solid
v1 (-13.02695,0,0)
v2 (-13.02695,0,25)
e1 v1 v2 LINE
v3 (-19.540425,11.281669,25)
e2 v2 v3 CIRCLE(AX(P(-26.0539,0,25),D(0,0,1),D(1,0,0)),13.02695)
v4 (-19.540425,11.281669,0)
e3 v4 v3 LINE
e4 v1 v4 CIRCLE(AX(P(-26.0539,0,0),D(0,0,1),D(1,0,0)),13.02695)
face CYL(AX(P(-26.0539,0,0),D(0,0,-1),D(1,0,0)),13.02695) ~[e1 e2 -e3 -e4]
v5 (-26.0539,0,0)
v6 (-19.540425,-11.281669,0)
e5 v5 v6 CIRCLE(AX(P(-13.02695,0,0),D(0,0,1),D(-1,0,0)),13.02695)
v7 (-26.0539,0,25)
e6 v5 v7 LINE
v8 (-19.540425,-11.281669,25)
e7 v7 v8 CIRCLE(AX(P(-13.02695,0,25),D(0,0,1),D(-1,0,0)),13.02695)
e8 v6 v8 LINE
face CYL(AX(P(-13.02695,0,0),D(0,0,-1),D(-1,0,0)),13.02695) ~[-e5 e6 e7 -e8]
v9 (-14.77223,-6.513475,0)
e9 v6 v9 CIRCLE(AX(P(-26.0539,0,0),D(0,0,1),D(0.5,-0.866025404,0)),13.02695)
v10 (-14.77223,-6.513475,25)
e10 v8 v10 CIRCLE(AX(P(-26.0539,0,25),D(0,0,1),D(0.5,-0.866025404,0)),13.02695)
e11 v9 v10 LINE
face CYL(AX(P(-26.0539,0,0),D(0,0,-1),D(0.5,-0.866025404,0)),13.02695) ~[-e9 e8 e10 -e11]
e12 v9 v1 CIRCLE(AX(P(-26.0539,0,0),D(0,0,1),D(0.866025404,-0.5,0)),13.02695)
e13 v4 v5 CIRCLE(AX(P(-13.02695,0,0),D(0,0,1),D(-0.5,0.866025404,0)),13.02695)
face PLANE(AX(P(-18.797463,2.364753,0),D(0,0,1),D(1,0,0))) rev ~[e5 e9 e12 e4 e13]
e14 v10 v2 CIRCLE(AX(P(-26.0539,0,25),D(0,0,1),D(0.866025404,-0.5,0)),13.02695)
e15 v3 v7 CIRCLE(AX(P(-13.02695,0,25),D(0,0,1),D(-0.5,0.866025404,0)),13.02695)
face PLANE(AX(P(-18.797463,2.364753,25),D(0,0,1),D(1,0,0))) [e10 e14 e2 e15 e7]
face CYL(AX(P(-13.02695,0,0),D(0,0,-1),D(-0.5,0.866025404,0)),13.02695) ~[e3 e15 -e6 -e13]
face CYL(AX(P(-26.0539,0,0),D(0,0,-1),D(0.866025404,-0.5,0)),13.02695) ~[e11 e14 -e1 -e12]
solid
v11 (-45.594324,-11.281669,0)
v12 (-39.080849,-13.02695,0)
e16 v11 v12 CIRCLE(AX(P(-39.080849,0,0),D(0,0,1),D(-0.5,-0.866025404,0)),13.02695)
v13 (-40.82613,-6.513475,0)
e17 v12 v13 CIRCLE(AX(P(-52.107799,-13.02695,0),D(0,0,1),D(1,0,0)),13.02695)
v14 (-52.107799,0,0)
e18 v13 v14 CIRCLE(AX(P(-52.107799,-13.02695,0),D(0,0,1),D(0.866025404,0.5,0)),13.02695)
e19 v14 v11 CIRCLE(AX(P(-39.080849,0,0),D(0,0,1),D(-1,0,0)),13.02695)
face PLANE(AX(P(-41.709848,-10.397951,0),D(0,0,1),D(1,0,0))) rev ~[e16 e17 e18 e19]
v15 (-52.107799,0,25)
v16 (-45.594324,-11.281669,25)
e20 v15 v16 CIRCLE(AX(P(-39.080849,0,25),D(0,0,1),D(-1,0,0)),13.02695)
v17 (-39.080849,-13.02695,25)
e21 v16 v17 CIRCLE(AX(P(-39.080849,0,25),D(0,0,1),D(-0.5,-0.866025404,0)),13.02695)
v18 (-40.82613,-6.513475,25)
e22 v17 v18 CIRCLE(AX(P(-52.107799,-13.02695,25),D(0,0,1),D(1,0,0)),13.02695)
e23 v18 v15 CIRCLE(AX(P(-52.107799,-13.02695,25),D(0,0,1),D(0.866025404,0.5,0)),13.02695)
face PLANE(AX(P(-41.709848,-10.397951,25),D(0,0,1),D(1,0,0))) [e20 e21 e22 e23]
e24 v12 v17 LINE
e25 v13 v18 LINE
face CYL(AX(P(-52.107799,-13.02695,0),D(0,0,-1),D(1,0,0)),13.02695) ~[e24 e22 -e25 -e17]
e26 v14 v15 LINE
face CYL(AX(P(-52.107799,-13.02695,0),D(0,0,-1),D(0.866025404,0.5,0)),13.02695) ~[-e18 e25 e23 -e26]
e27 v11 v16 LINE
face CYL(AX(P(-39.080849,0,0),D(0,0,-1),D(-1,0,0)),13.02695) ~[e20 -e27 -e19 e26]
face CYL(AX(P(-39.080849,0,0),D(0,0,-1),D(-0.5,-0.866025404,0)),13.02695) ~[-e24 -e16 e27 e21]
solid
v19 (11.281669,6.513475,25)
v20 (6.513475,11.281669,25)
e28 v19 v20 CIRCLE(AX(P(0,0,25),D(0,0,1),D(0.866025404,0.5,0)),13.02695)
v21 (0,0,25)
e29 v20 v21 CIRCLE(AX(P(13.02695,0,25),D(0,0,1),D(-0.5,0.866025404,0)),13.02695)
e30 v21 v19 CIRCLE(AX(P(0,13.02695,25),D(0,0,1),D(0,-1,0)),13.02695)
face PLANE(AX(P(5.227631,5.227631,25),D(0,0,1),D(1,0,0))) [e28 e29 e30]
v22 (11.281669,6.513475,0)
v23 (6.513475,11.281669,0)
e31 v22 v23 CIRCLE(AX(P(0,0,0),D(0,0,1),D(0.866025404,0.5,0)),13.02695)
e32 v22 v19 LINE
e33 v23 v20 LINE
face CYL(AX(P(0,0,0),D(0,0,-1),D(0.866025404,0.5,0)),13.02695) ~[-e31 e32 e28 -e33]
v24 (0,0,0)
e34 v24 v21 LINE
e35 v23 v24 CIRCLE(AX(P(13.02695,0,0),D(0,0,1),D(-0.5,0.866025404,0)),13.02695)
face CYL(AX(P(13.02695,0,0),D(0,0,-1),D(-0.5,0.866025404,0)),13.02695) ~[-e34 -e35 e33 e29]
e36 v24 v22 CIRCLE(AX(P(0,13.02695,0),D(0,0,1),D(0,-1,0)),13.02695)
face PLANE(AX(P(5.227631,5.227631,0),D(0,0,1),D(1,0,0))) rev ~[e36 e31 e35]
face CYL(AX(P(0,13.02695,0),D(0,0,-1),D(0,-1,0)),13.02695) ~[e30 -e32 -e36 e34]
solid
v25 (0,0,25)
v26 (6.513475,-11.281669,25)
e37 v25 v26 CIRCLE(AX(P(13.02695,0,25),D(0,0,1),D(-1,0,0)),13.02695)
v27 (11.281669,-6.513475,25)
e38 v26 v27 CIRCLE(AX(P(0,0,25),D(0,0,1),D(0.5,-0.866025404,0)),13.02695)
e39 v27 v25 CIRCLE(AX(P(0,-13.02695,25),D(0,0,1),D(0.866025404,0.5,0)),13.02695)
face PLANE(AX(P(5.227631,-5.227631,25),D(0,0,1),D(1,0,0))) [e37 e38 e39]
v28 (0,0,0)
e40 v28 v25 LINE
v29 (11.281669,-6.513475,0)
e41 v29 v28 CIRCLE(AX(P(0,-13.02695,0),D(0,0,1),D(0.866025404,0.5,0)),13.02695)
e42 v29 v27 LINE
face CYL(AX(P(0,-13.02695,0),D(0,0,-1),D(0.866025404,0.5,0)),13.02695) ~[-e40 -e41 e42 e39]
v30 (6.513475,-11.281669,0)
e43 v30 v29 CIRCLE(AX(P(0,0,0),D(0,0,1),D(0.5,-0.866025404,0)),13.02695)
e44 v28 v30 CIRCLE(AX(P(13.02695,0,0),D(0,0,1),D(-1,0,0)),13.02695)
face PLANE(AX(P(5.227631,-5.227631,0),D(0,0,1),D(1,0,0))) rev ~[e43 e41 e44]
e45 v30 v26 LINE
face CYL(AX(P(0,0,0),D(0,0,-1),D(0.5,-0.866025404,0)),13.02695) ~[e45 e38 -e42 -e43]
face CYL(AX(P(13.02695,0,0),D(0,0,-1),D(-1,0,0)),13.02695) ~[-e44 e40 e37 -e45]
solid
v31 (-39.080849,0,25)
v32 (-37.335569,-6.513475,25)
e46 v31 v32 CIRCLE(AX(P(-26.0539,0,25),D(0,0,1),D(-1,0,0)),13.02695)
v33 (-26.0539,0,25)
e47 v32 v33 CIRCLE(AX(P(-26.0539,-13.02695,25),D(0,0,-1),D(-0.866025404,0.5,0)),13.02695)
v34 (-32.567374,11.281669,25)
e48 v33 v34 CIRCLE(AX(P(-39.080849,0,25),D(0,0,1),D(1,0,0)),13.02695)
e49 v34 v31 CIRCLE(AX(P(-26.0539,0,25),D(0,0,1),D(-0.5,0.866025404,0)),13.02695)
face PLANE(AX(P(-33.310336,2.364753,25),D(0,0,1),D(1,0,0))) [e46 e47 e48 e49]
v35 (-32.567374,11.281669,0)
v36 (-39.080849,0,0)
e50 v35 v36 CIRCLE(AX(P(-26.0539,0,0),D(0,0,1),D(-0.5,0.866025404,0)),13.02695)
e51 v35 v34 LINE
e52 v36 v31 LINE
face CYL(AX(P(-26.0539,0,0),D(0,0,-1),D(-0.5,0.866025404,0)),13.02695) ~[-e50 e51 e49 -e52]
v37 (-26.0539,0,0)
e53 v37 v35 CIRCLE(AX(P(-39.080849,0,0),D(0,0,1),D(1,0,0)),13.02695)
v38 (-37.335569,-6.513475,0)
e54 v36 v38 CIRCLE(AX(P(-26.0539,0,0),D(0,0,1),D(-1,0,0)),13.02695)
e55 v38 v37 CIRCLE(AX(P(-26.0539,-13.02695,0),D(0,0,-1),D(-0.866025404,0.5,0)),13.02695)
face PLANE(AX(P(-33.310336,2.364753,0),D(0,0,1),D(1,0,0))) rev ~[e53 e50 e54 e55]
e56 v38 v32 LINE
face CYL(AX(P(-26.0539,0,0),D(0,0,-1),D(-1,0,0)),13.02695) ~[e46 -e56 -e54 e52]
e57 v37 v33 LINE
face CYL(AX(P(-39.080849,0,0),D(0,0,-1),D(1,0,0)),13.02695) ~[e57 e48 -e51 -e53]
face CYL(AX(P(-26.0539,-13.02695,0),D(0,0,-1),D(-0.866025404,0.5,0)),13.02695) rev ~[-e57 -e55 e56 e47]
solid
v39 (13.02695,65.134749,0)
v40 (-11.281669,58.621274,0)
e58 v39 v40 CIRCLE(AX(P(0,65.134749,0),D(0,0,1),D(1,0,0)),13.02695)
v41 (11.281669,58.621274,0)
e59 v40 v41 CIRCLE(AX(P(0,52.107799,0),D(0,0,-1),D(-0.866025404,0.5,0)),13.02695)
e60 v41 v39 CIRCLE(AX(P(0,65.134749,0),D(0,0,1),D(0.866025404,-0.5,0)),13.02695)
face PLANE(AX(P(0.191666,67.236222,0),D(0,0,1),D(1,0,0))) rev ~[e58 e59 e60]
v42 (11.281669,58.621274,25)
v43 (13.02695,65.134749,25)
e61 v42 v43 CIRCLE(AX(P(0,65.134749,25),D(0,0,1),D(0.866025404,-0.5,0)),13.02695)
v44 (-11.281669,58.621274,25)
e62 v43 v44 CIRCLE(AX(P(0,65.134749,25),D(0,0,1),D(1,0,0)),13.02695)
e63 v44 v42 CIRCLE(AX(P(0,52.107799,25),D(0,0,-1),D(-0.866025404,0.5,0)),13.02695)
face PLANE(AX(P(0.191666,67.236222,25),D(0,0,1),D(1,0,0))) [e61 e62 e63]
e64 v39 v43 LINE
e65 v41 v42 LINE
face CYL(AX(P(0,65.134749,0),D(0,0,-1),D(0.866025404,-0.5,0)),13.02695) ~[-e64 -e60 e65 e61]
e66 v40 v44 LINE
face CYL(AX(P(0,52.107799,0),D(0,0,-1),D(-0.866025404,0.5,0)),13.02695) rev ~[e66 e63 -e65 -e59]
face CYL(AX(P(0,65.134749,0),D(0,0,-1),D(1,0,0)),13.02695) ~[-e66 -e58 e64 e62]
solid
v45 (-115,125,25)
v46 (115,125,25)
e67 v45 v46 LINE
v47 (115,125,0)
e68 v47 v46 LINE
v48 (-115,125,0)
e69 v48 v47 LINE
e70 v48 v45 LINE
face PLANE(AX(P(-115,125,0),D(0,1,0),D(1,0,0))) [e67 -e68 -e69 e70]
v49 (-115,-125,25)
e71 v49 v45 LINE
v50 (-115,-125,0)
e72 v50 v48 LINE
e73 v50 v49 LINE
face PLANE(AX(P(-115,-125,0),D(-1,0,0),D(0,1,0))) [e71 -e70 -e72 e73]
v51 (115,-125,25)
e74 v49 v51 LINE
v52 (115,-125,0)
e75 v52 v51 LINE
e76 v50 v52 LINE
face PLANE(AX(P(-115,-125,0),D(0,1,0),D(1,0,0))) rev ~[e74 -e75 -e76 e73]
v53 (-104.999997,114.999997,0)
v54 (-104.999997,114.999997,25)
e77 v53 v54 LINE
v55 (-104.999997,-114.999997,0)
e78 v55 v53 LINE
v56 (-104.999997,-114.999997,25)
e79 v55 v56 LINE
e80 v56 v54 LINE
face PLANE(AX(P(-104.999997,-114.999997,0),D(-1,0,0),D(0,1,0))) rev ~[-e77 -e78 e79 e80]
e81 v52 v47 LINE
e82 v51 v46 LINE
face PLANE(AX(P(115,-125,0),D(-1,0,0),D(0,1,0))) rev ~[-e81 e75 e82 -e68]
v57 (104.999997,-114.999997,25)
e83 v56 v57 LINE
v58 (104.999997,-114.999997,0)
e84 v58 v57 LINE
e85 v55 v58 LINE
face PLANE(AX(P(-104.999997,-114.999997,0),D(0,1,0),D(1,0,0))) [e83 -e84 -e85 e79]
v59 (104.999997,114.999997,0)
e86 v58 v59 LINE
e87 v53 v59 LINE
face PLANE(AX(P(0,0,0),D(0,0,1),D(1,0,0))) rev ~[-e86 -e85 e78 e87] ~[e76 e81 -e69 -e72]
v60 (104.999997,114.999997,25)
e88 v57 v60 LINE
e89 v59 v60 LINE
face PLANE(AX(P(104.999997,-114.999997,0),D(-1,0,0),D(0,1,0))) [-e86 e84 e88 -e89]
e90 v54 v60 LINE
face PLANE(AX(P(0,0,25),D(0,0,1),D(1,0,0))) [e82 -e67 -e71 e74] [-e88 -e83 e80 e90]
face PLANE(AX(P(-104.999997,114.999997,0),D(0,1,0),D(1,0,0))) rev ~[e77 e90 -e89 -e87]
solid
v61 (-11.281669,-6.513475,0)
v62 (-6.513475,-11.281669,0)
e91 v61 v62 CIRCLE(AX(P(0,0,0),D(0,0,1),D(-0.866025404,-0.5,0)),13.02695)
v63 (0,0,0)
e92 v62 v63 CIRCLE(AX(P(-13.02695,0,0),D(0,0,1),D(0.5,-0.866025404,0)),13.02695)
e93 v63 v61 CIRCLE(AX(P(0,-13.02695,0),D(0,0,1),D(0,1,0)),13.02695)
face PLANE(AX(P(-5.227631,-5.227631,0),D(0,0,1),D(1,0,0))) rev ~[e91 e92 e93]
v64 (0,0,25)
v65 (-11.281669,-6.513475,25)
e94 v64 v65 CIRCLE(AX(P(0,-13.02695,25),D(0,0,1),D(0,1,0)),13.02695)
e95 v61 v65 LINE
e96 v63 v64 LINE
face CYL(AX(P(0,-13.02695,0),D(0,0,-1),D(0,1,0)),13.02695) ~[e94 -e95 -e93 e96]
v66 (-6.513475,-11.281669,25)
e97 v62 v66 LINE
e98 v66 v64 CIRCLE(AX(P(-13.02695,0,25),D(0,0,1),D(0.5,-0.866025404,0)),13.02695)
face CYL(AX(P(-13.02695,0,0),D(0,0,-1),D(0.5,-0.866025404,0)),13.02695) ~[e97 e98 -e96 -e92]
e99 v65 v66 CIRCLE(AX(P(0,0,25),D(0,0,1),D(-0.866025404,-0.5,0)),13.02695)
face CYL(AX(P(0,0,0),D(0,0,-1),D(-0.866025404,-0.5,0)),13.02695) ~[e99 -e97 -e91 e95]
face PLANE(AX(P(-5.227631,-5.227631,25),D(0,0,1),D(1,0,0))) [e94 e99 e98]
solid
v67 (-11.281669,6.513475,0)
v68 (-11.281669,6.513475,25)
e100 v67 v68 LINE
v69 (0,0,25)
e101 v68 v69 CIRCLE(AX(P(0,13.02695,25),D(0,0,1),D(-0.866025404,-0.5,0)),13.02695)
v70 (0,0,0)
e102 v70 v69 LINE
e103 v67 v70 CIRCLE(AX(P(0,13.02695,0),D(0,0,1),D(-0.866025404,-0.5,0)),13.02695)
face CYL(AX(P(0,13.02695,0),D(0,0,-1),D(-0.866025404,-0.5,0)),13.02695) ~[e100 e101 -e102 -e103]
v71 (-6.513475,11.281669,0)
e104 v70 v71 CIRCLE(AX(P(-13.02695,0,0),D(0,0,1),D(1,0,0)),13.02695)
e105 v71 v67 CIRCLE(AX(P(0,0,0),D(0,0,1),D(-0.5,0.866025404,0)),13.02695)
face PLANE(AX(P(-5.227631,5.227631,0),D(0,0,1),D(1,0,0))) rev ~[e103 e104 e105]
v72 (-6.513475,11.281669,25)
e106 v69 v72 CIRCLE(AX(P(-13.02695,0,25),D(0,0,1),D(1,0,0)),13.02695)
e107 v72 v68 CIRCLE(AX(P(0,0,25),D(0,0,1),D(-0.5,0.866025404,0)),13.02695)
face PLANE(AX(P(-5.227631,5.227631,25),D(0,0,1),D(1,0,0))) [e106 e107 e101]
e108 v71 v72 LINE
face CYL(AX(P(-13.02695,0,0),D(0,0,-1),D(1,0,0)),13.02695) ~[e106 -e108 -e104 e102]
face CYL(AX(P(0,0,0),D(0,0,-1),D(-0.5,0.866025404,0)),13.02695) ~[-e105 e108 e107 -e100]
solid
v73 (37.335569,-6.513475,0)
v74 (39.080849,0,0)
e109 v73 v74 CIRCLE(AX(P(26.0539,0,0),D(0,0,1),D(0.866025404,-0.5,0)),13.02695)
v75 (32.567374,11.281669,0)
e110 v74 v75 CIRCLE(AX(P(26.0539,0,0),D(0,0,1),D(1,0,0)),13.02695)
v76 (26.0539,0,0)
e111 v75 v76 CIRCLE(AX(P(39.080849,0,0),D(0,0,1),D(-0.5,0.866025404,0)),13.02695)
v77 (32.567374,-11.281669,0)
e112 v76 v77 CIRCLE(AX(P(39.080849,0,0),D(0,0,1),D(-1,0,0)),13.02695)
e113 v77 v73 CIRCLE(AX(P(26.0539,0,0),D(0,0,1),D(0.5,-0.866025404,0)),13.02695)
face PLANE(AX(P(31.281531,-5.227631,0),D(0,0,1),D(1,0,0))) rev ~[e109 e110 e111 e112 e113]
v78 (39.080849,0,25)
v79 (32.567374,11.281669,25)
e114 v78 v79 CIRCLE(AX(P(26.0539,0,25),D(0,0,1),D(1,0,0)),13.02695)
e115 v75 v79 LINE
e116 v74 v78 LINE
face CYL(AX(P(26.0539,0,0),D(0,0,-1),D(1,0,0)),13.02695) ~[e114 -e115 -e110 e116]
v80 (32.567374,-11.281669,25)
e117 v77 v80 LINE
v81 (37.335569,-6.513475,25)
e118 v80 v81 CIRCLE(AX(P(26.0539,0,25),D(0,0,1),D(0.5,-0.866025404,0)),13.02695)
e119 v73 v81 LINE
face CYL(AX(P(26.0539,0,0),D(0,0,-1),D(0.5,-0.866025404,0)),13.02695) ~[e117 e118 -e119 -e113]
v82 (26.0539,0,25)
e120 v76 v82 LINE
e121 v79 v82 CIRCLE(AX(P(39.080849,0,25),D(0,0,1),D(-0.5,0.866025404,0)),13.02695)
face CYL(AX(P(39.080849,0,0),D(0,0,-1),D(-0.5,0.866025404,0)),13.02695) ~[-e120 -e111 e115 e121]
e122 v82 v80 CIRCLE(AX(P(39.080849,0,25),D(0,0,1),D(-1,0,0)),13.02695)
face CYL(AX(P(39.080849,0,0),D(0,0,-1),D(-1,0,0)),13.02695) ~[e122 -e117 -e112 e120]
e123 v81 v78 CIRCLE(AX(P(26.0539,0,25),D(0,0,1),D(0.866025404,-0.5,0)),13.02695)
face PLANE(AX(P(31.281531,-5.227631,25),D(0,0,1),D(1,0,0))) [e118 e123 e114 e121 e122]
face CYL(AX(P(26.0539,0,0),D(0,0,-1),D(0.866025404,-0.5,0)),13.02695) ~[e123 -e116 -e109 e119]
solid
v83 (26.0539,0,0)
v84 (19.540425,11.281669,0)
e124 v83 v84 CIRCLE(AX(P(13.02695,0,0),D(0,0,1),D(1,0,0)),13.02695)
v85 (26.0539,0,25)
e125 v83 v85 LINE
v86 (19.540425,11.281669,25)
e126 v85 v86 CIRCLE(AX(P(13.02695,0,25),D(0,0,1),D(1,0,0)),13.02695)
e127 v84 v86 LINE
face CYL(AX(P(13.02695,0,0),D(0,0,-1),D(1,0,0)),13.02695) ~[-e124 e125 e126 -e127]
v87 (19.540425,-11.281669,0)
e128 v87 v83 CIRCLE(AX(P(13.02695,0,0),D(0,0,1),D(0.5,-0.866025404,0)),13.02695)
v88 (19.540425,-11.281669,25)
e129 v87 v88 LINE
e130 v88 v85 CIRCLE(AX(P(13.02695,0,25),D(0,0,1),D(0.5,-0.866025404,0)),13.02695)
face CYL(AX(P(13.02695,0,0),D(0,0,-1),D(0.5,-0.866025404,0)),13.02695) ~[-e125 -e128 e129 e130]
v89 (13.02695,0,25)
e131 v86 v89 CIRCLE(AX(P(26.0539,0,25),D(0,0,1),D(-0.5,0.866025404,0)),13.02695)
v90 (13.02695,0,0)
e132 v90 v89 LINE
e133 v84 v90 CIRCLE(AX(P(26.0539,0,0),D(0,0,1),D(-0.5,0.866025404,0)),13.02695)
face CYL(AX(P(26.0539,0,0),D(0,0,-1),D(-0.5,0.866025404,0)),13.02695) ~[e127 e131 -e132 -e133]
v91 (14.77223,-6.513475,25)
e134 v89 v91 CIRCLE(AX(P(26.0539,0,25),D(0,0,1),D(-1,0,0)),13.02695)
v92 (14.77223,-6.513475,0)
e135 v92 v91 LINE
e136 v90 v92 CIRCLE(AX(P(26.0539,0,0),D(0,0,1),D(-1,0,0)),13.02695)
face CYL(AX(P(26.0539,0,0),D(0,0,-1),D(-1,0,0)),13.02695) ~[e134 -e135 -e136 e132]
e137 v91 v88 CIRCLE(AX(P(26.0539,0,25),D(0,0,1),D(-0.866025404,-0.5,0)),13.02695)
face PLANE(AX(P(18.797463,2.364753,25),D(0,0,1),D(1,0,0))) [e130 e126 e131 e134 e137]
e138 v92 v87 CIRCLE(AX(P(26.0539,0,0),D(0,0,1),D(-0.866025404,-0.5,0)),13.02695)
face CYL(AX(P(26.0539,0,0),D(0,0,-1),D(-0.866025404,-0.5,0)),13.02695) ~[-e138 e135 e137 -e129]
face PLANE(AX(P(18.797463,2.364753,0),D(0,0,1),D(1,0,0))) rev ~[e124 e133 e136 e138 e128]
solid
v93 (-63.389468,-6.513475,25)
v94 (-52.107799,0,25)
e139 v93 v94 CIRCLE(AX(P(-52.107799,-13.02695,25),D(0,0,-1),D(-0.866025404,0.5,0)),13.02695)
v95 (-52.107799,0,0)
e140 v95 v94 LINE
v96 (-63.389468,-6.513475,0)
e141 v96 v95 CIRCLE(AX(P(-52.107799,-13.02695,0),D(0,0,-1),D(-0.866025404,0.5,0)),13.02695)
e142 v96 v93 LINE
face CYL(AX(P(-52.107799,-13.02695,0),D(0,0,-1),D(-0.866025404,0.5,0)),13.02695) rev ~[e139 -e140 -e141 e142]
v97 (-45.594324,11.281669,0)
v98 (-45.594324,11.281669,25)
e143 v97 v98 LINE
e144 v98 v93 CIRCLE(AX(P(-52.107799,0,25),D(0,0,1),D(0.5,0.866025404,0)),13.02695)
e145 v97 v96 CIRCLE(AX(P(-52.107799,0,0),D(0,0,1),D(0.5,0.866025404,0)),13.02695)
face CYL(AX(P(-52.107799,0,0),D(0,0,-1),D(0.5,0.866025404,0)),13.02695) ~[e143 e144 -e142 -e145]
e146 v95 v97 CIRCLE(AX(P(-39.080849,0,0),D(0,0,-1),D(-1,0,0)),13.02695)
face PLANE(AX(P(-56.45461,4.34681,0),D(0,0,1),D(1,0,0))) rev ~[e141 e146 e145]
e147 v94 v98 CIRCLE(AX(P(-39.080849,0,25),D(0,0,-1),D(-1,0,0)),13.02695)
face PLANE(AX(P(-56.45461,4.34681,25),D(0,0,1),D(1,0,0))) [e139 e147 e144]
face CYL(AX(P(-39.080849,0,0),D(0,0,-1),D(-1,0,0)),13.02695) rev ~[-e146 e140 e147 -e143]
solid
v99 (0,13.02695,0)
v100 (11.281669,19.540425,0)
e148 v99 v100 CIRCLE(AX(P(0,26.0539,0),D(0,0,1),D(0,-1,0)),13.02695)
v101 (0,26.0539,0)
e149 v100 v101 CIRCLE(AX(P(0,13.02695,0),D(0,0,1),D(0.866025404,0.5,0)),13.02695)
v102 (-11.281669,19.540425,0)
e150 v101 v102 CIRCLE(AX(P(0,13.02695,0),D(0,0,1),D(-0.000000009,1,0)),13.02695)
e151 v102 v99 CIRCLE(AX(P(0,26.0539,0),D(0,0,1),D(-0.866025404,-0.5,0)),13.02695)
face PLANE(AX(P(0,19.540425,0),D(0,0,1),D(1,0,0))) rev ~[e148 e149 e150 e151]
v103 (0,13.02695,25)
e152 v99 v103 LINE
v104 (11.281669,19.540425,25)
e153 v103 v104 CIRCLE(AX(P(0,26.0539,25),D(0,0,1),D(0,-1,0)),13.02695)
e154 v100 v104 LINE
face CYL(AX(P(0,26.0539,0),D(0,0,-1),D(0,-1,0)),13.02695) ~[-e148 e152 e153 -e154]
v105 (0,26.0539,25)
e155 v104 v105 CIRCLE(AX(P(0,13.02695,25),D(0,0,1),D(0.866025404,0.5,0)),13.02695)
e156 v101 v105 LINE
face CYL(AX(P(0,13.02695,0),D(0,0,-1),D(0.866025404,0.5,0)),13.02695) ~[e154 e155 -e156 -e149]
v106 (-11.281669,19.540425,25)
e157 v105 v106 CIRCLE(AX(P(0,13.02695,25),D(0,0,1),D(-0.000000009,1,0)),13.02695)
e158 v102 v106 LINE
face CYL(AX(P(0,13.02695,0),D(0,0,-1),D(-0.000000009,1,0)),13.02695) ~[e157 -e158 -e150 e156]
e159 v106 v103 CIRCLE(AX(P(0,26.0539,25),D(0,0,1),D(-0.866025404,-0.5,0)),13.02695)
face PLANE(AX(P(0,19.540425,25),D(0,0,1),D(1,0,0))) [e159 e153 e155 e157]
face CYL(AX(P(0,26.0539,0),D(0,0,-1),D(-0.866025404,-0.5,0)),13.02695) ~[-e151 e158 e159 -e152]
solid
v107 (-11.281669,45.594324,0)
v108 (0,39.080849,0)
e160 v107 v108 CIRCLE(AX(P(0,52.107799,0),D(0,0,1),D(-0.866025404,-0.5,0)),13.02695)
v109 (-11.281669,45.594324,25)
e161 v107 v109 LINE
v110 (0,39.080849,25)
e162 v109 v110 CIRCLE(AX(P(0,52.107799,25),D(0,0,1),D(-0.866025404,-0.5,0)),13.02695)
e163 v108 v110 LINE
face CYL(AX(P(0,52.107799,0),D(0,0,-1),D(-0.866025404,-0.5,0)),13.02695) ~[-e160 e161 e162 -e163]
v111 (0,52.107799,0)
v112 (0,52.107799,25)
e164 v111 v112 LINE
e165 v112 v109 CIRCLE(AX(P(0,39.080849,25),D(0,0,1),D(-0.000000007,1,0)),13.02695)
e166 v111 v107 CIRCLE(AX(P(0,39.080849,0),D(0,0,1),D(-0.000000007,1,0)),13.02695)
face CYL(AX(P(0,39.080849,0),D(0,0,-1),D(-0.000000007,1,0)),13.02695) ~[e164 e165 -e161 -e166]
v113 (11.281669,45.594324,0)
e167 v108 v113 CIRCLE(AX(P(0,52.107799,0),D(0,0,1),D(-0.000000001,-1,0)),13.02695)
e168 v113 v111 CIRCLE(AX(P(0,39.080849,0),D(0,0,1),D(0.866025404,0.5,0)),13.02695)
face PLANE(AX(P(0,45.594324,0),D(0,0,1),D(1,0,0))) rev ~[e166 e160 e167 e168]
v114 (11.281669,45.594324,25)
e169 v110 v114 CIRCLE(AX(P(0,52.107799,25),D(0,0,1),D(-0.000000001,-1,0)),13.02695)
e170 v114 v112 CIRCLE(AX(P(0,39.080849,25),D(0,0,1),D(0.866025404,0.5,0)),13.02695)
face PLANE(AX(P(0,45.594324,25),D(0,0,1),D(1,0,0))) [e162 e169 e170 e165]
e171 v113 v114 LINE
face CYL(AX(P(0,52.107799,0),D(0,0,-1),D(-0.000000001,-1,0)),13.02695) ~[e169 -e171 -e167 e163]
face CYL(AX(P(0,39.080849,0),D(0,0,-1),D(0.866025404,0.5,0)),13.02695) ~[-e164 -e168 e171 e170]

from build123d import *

# Parameters (mm, degrees)
F0_W     = 230
F0_H     = 250
F0_W_2   = 209.9999934435
F0_H_2   = 229.9999934435
F1_DEPTH = 25
F3_DEPTH = 25


with BuildPart() as f1:
    # F0 (on Top) → F1 (new body)
    with BuildSketch(Plane.XY):
        Rectangle(F0_W, F0_H)
        Rectangle(F0_W_2, F0_H_2, mode=Mode.SUBTRACT)
    extrude(amount=F1_DEPTH)


with BuildPart() as f3:
    # F2 (on Top) → F3 (new body)
    with BuildSketch(Plane.XY):
        with BuildLine():
            ThreePointArc((19.5404246493, 11.2816694314), (14.7722301011, 6.5134748831), (13.0269497662, 0))
            ThreePointArc((13.0269497662, 0), (13.4708323155, -3.3716226991), (14.7722301011, -6.5134748831))
            ThreePointArc((14.7722301011, -6.5134748831), (19.5404246493, -1.7452803349), (26.0538995325, 0))
            ThreePointArc((26.0538995325, 0), (24.3086191976, 6.5134748831), (19.5404246493, 11.2816694314))
        make_face()
        with BuildLine():
            ThreePointArc((26.0538995325, 0), (19.5404246493, -1.7452803349), (14.7722301011, -6.5134748831))
            ThreePointArc((14.7722301011, -6.5134748831), (16.8424550146, -9.2114445179), (19.5404246493, -11.2816694314))
            ThreePointArc((19.5404246493, -11.2816694314), (24.3086191976, -6.5134748831), (26.0538995325, 0))
        make_face()
    extrude(amount=F3_DEPTH)


with BuildPart() as f3b:
    # F2 (on Top) → F3, piece 2 (new body)
    with BuildSketch(Plane.XY):
        with BuildLine():
            ThreePointArc((0, 0), (6.5134748831, 1.7452803349), (11.2816694314, 6.5134748831))
            ThreePointArc((11.2816694314, 6.5134748831), (9.2114445179, 9.2114445179), (6.5134748831, 11.2816694314))
            ThreePointArc((6.5134748831, 11.2816694314), (1.7452803349, 6.5134748831), (0, 0))
        make_face()
    extrude(amount=F3_DEPTH)


with BuildPart() as f3c:
    # F2 (on Top) → F3, piece 3 (new body)
    with BuildSketch(Plane.XY):
        with BuildLine():
            ThreePointArc((6.5134748831, -11.2816694314), (9.2114445179, -9.2114445179), (11.2816694314, -6.5134748831))
            ThreePointArc((11.2816694314, -6.5134748831), (6.5134748831, -1.7452803349), (0, 0))
            ThreePointArc((0, 0), (1.7452803349, -6.5134748831), (6.5134748831, -11.2816694314))
        make_face()
    extrude(amount=F3_DEPTH)


with BuildPart() as f3d:
    # F2 (on Top) → F3, piece 4 (new body)
    with BuildSketch(Plane.XY):
        with BuildLine():
            ThreePointArc((-11.2816694314, 6.5134748831), (-6.5134748831, 1.7452803349), (0, 0))
            ThreePointArc((0, 0), (-1.7452803349, 6.5134748831), (-6.5134748831, 11.2816694314))
            ThreePointArc((-6.5134748831, 11.2816694314), (-9.2114445179, 9.2114445179), (-11.2816694314, 6.5134748831))
        make_face()
    extrude(amount=F3_DEPTH)


with BuildPart() as f3e:
    # F2 (on Top) → F3, piece 5 (new body)
    with BuildSketch(Plane.XY):
        with BuildLine():
            ThreePointArc((-6.5134748831, -11.2816694314), (-1.7452803349, -6.5134748831), (0, 0))
            ThreePointArc((0, 0), (-6.5134748831, -1.7452803349), (-11.2816694314, -6.5134748831))
            ThreePointArc((-11.2816694314, -6.5134748831), (-9.2114445179, -9.2114445179), (-6.5134748831, -11.2816694314))
        make_face()
    extrude(amount=F3_DEPTH)


with BuildPart() as f3f:
    # F2 (on Top) → F3, piece 6 (new body)
    with BuildSketch(Plane.XY):
        with BuildLine():
            ThreePointArc((37.3355689638, -6.5134748831), (32.5673744156, -1.7452803349), (26.0538995325, 0))
            ThreePointArc((26.0538995325, 0), (27.7991798673, -6.5134748831), (32.5673744156, -11.2816694314))
            ThreePointArc((32.5673744156, -11.2816694314), (35.2653440503, -9.2114445179), (37.3355689638, -6.5134748831))
        make_face()
        with BuildLine():
            ThreePointArc((32.5673744156, 11.2816694314), (27.7991798673, 6.5134748831), (26.0538995325, 0))
            ThreePointArc((26.0538995325, 0), (32.5673744156, -1.7452803349), (37.3355689638, -6.5134748831))
            ThreePointArc((37.3355689638, -6.5134748831), (38.6369667494, -3.3716226991), (39.0808492987, 0))
            ThreePointArc((39.0808492987, 0), (37.3355689638, 6.5134748831), (32.5673744156, 11.2816694314))
        make_face()
    extrude(amount=F3_DEPTH)


with BuildPart() as f3g:
    # F2 (on Top) → F3, piece 7 (new body)
    with BuildSketch(Plane.XY):
        with BuildLine():
            ThreePointArc((-11.2816694314, 19.5404246493), (-6.5134748831, 14.7722301011), (0, 13.0269497662))
            ThreePointArc((0, 13.0269497662), (6.5134748831, 14.7722301011), (11.2816694314, 19.5404246493))
            ThreePointArc((11.2816694314, 19.5404246493), (6.5134748329, 24.3086192266), (-1.16e-07, 26.0538995325))
            ThreePointArc((-1.16e-07, 26.0538995325), (-6.5134749333, 24.3086191686), (-11.2816694314, 19.5404246493))
        make_face()
    extrude(amount=F3_DEPTH)


with BuildPart() as f3h:
    # F2 (on Top) → F3, piece 8 (new body)
    with BuildSketch(Plane.XY):
        with BuildLine():
            ThreePointArc((-14.7722301011, -6.5134748831), (-13.4708323155, -3.3716226991), (-13.0269497662, 0))
            ThreePointArc((-13.0269497662, 0), (-14.7722301011, 6.5134748831), (-19.5404246493, 11.2816694314))
            ThreePointArc((-19.5404246493, 11.2816694314), (-24.3086191976, 6.5134748831), (-26.0538995325, 0))
            ThreePointArc((-26.0538995325, 0), (-19.5404246493, -1.7452803349), (-14.7722301011, -6.5134748831))
        make_face()
        with BuildLine():
            ThreePointArc((-26.0538995325, 0), (-24.3086191976, -6.5134748831), (-19.5404246493, -11.2816694314))
            ThreePointArc((-19.5404246493, -11.2816694314), (-16.8424550146, -9.2114445179), (-14.7722301011, -6.5134748831))
            ThreePointArc((-14.7722301011, -6.5134748831), (-19.5404246493, -1.7452803349), (-26.0538995325, 0))
        make_face()
    extrude(amount=F3_DEPTH)


with BuildPart() as f3i:
    # F2 (on Top) → F3, piece 9 (new body)
    with BuildSketch(Plane.XY):
        with BuildLine():
            ThreePointArc((-45.5943241818, -11.2816694314), (-42.4524719978, -12.583067217), (-39.0808492987, -13.0269497662))
            ThreePointArc((-39.0808492987, -13.0269497662), (-39.5247318479, -9.6553270671), (-40.8261296335, -6.5134748831))
            ThreePointArc((-40.8261296335, -6.5134748831), (-42.896354547, -9.2114445179), (-45.5943241818, -11.2816694314))
        make_face()
        with BuildLine():
            ThreePointArc((-52.1077990649, 0), (-50.3625187301, -6.5134748831), (-45.5943241818, -11.2816694314))
            ThreePointArc((-45.5943241818, -11.2816694314), (-42.896354547, -9.2114445179), (-40.8261296335, -6.5134748831))
            ThreePointArc((-40.8261296335, -6.5134748831), (-45.5943241818, -1.7452803349), (-52.1077990649, 0))
        make_face()
    extrude(amount=F3_DEPTH)


with BuildPart() as f3j:
    # F2 (on Top) → F3, piece 10 (new body)
    with BuildSketch(Plane.XY):
        with BuildLine():
            ThreePointArc((-37.3355689638, -6.5134748831), (-32.5673744156, -1.7452803349), (-26.0538995325, 0))
            ThreePointArc((-26.0538995325, 0), (-27.7991798673, 6.5134748831), (-32.5673744156, 11.2816694314))
            ThreePointArc((-32.5673744156, 11.2816694314), (-37.3355689638, 6.5134748831), (-39.0808492987, 0))
            ThreePointArc((-39.0808492987, 0), (-38.6369667494, -3.3716226991), (-37.3355689638, -6.5134748831))
        make_face()
    extrude(amount=F3_DEPTH)


with BuildPart() as f3k:
    # F2 (on Top) → F3, piece 11 (new body)
    with BuildSketch(Plane.XY):
        with BuildLine():
            ThreePointArc((-45.5943241818, 11.2816694314), (-61.3192435828, 9.2114445179), (-63.3894684963, -6.5134748831))
            ThreePointArc((-63.3894684963, -6.5134748831), (-58.621273948, -1.7452803349), (-52.1077990649, 0))
            ThreePointArc((-52.1077990649, 0), (-50.3625187301, 6.5134748831), (-45.5943241818, 11.2816694314))
        make_face()
    extrude(amount=F3_DEPTH)


with BuildPart() as f3l:
    # F2 (on Top) → F3, piece 12 (new body)
    with BuildSketch(Plane.XY):
        with BuildLine():
            ThreePointArc((-11.2816694314, 45.5943241818), (-6.513474888, 40.8261296364), (-1.14e-08, 39.0808492987))
            ThreePointArc((-1.14e-08, 39.0808492987), (6.5134748782, 40.8261296307), (11.2816694314, 45.5943241818))
            ThreePointArc((11.2816694314, 45.5943241818), (6.5134748436, 50.3625187529), (-9.13e-08, 52.1077990649))
            ThreePointArc((-9.13e-08, 52.1077990649), (-6.5134749226, 50.3625187072), (-11.2816694314, 45.5943241818))
        make_face()
    extrude(amount=F3_DEPTH)


with BuildPart() as f3m:
    # F2 (on Top) → F3, piece 13 (new body)
    with BuildSketch(Plane.XY):
        with BuildLine():
            ThreePointArc((13.0269497662, 65.1347488311), (-3.3716226991, 77.7178160481), (-11.2816694314, 58.621273948))
            ThreePointArc((-11.2816694314, 58.621273948), (0, 65.1347488311), (11.2816694314, 58.621273948))
            ThreePointArc((11.2816694314, 58.621273948), (12.583067217, 61.763126132), (13.0269497662, 65.1347488311))
        make_face()
    extrude(amount=F3_DEPTH)


solid = Compound([f1.part, f3.part, f3b.part, f3c.part, f3d.part, f3e.part, f3f.part, f3g.part, f3h.part, f3i.part, f3j.part, f3k.part, f3l.part, f3m.part])
